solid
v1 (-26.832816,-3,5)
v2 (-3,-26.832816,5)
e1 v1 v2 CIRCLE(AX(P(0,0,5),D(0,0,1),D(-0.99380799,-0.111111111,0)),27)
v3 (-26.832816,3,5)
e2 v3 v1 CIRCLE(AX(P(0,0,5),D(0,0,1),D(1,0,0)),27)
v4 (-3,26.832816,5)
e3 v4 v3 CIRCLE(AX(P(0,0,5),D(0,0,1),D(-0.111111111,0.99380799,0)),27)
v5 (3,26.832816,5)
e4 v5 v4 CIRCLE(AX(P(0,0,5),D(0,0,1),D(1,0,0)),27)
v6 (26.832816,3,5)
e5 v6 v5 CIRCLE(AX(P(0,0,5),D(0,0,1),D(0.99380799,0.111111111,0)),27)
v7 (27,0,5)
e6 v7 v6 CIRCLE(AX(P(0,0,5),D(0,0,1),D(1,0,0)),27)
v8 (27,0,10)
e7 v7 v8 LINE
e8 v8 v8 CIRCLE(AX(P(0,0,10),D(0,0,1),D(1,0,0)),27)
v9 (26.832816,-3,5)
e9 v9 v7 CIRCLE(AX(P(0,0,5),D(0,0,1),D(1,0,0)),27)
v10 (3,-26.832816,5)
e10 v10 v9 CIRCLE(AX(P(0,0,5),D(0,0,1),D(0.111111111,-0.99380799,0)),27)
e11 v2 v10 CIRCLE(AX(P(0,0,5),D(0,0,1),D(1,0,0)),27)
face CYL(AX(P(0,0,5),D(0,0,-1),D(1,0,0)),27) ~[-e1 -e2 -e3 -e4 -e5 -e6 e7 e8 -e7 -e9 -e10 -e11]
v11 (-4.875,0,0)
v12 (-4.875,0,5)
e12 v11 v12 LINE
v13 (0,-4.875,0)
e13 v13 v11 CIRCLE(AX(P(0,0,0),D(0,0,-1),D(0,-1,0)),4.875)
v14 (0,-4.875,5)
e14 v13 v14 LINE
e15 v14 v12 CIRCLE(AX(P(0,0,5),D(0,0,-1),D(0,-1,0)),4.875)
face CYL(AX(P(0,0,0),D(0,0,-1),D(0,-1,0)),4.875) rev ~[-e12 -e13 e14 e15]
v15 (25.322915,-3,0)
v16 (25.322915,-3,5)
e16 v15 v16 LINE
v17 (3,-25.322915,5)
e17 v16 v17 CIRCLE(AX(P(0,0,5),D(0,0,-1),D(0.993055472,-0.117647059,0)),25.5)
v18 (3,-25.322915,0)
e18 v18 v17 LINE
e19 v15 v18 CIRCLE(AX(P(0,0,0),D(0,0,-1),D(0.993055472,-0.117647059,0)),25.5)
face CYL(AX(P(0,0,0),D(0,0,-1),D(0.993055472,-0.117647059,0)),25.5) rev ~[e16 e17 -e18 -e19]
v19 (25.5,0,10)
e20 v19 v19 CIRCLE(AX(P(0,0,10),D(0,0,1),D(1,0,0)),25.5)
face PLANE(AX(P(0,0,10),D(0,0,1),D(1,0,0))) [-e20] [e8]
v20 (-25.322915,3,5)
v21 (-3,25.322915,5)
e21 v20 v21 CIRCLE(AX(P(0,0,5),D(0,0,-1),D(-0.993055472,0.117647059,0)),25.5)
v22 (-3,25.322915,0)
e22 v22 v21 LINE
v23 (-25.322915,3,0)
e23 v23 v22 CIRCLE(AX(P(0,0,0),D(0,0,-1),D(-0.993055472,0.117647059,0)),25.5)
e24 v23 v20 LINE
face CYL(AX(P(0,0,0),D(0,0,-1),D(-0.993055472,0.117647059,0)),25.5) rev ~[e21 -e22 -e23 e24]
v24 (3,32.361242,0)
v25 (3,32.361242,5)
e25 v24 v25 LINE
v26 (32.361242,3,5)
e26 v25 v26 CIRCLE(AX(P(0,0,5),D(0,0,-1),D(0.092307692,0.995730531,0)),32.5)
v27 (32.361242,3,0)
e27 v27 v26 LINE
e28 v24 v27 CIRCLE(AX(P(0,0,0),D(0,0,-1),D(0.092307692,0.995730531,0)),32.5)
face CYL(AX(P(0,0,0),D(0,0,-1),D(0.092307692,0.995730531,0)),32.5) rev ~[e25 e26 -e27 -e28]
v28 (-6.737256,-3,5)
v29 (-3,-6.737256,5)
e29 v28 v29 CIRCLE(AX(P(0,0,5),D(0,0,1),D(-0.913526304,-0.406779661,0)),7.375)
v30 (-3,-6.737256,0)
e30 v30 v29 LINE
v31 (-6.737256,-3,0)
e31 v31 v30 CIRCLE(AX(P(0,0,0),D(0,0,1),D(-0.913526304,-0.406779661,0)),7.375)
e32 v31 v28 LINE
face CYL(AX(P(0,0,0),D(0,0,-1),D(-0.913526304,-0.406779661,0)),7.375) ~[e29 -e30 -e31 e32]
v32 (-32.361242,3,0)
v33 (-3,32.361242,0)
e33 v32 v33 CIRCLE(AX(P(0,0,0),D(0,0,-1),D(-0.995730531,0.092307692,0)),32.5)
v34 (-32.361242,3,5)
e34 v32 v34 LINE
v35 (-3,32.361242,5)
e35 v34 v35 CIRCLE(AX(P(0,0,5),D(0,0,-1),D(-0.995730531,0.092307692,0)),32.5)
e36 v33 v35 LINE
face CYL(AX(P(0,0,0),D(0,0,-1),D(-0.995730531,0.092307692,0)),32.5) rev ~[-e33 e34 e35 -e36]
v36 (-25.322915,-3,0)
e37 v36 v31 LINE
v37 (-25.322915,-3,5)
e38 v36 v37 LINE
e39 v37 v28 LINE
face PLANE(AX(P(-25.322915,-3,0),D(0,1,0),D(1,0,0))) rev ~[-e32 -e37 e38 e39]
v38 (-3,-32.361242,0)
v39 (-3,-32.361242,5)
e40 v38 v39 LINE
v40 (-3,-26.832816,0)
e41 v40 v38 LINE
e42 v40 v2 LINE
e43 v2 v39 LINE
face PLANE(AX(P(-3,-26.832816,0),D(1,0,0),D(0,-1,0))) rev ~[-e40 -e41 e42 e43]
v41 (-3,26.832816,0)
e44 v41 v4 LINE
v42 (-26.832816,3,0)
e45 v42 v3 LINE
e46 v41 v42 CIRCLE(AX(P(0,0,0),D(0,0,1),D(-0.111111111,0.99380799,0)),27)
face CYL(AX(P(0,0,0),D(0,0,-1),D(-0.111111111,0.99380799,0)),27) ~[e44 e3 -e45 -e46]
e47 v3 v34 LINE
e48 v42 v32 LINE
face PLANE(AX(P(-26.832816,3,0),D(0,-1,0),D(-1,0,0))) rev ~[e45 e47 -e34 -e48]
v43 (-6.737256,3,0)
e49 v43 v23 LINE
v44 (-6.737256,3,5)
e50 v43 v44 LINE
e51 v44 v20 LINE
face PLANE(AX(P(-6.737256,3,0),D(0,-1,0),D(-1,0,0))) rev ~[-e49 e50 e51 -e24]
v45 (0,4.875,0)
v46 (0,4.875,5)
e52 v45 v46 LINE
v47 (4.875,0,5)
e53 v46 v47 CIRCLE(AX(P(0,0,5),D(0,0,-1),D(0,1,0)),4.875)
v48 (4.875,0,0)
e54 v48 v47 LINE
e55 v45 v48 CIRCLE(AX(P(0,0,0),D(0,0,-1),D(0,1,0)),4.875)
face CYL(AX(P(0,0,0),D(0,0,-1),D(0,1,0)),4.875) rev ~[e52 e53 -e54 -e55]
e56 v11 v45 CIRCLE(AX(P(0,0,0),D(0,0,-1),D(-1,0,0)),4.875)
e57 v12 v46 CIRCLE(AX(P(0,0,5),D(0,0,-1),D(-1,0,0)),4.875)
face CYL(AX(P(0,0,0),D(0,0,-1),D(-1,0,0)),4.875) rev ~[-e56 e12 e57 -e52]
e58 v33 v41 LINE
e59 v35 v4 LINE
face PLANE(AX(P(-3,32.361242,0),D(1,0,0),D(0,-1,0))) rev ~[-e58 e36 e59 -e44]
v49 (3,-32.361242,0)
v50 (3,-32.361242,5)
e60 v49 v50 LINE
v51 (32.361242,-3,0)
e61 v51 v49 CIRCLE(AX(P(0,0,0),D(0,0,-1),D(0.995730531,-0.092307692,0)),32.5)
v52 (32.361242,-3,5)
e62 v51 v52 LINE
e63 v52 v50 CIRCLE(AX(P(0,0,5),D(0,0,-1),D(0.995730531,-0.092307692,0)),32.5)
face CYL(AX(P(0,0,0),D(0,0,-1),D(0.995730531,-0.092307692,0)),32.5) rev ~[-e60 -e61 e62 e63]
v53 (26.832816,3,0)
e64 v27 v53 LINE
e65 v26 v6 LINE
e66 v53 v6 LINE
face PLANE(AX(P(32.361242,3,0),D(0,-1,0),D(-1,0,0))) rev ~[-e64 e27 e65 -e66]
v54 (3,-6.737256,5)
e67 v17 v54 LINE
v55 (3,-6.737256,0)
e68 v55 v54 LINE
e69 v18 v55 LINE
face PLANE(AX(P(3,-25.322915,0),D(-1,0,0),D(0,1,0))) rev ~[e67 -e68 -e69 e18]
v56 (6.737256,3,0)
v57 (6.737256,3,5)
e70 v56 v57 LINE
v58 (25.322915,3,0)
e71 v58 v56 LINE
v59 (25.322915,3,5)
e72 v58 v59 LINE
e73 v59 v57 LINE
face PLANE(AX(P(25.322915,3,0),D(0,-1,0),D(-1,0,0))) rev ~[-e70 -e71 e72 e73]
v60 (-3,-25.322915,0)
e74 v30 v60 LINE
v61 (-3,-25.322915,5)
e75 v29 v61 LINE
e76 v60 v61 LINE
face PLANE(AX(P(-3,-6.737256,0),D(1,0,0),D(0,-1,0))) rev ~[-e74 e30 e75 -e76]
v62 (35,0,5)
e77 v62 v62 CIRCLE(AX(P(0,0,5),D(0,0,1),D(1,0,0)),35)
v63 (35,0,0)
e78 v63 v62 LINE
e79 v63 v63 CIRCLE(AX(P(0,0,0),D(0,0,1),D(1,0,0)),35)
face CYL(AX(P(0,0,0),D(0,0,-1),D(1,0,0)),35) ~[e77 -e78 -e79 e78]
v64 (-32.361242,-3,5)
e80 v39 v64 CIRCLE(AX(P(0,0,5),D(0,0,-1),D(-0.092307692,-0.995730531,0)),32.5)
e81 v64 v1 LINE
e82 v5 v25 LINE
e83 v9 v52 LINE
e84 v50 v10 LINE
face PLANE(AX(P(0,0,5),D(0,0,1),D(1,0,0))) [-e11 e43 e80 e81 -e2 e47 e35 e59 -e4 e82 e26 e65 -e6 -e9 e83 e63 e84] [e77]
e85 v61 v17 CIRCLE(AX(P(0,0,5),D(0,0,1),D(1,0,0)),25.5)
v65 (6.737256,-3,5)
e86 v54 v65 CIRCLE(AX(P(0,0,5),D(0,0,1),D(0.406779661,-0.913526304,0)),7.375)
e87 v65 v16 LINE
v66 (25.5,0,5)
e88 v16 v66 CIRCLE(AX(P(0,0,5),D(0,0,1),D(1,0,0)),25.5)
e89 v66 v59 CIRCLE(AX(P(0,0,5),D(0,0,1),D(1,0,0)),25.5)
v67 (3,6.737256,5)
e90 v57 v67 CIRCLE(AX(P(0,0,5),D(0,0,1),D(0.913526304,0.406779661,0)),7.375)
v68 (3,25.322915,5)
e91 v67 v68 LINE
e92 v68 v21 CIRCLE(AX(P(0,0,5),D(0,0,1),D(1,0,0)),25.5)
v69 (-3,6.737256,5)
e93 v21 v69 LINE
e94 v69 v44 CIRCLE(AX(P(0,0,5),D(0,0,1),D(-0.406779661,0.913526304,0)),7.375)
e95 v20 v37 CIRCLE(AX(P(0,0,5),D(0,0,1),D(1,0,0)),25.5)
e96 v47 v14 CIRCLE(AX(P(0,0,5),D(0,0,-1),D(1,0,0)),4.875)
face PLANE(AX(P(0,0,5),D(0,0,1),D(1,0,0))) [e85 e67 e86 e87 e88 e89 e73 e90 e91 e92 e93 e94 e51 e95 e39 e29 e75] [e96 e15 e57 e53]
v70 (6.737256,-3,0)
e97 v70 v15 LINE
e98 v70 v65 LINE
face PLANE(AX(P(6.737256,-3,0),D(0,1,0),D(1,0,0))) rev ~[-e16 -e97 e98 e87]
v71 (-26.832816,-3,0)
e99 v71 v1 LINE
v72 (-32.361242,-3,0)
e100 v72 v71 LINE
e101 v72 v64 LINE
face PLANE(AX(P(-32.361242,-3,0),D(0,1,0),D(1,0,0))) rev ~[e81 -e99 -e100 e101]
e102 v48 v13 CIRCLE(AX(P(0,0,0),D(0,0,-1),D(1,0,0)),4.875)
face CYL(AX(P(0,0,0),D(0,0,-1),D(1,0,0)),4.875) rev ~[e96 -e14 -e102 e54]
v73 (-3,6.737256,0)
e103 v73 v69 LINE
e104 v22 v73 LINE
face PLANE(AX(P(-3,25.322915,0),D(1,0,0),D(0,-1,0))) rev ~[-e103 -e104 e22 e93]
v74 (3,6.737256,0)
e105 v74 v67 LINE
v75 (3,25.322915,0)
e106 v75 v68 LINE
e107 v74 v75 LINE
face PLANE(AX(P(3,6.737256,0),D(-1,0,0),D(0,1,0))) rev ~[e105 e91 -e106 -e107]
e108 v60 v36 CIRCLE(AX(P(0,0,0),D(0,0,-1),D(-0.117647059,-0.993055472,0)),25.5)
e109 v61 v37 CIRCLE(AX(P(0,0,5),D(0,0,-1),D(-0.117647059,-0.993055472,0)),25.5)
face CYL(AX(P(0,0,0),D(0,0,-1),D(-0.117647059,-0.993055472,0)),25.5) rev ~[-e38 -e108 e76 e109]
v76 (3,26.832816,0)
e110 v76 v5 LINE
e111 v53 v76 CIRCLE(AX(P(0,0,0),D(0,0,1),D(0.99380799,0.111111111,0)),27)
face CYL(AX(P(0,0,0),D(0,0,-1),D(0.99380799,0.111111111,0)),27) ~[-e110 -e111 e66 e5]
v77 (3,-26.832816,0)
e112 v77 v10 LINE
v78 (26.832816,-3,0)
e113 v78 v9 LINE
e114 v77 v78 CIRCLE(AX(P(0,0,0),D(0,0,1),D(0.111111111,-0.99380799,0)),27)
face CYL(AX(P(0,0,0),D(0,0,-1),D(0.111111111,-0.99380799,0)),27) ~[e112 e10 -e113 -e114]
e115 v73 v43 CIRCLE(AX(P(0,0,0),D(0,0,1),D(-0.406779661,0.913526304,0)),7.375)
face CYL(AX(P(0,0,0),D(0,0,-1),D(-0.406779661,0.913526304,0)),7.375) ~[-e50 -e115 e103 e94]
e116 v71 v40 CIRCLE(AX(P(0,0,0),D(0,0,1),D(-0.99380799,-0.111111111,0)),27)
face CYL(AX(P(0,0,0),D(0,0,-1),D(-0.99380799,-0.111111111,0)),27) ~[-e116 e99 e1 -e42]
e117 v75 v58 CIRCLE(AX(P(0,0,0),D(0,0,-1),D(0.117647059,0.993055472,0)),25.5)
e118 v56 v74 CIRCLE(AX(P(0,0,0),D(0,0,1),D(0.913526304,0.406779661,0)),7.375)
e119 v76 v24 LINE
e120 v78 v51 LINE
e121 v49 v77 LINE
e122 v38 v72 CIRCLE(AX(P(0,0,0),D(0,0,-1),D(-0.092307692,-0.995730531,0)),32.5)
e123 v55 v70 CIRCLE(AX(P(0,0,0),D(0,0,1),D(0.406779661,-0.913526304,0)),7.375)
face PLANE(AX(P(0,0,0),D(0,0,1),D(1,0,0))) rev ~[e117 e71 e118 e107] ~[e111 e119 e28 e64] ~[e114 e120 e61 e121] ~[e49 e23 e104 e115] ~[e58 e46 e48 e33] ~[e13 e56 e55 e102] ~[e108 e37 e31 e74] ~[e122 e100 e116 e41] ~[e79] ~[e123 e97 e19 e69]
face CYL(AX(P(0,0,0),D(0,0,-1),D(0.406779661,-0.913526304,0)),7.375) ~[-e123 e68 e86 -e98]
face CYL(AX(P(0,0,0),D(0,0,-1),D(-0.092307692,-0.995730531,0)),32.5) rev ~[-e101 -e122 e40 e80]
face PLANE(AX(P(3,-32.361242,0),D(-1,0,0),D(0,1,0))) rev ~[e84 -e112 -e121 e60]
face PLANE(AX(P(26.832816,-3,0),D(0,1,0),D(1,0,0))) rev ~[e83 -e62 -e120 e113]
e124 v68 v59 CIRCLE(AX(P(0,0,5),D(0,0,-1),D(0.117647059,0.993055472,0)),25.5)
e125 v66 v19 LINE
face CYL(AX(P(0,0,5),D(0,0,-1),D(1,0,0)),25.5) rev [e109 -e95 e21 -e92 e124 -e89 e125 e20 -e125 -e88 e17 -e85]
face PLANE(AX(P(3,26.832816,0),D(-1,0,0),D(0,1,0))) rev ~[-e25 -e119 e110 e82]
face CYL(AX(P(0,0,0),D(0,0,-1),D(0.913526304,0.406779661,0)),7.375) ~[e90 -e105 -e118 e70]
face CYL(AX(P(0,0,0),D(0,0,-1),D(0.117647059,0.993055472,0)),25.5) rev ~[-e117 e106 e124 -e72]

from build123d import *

# Parameters (mm, degrees)
F0_R     = 35
F1_DEPTH = 5
F2_R     = 27
F2_R_2   = 25.5
F3_DEPTH = 5


with BuildPart() as f1:
    # F0 (on Top) → F1 (new body)
    with BuildSketch(Plane.XY):
        Circle(F0_R)
        with BuildLine():
            ThreePointArc((3, 32.3612422506), (22.9809703886, 22.9809703886), (32.3612422506, 3))
            ThreePointArc((32.3612422506, 3), (32.4652920297, 1.5016036189), (32.5, 0))
            ThreePointArc((32.5, 0), (32.4652920297, -1.5016036189), (32.3612422506, -3))
            ThreePointArc((32.3612422506, -3), (22.9809703886, -22.9809703886), (3, -32.3612422506))
            ThreePointArc((3, -32.3612422506), (0, -32.5), (-3, -32.3612422506))
            ThreePointArc((-3, -32.3612422506), (-22.9809703886, -22.9809703886), (-32.3612422506, -3))
            ThreePointArc((-32.3612422506, -3), (-32.5, 0), (-32.3612422506, 3))
            ThreePointArc((-32.3612422506, 3), (-22.9809703886, 22.9809703886), (-3, 32.3612422506))
            ThreePointArc((-3, 32.3612422506), (0, 32.5), (3, 32.3612422506))
        make_face(mode=Mode.SUBTRACT)
        with BuildLine():
            ThreePointArc((-6.7372564891, -3), (-7.2138024511, -1.5335185674), (-7.375, 0))
            ThreePointArc((-7.375, 0), (-7.2138024511, 1.5335185674), (-6.7372564891, 3))
            Line((-6.7372564891, 3), (-23.8117617996, 3))
            ThreePointArc((-23.8117617996, 3), (-24, 0), (-23.8117617996, -3))
            Line((-23.8117617996, -3), (-6.7372564891, -3))
        make_face()
        with BuildLine():
            ThreePointArc((-4.875, 0), (-3.4471455583, 3.4471455583), (0, 4.875))
            Line((0, 4.875), (0, 7.375))
            ThreePointArc((0, 7.375), (-1.5335185674, 7.2138024511), (-3, 6.7372564891))
            ThreePointArc((-3, 6.7372564891), (-5.2149125113, 5.2149125113), (-6.7372564891, 3))
            ThreePointArc((-6.7372564891, 3), (-7.2138024511, 1.5335185674), (-7.375, 0))
            Line((-7.375, 0), (-4.875, 0))
        make_face()
        with BuildLine():
            Line((0, -7.375), (0, -4.875))
            ThreePointArc((0, -4.875), (-3.4471455583, -3.4471455583), (-4.875, 0))
            Line((-4.875, 0), (-7.375, 0))
            ThreePointArc((-7.375, 0), (-7.2138024511, -1.5335185674), (-6.7372564891, -3))
            ThreePointArc((-6.7372564891, -3), (-5.2149125113, -5.2149125113), (-3, -6.7372564891))
            ThreePointArc((-3, -6.7372564891), (-1.5335185674, -7.2138024511), (0, -7.375))
        make_face()
        with BuildLine():
            Line((7.375, 0), (4.875, 0))
            ThreePointArc((4.875, 0), (3.4471455583, -3.4471455583), (0, -4.875))
            Line((0, -4.875), (0, -7.375))
            ThreePointArc((0, -7.375), (1.5335185674, -7.2138024511), (3, -6.7372564891))
            ThreePointArc((3, -6.7372564891), (5.2149125113, -5.2149125113), (6.7372564891, -3))
            ThreePointArc((6.7372564891, -3), (7.2138024511, -1.5335185674), (7.375, 0))
        make_face()
        with BuildLine():
            ThreePointArc((0, 4.875), (3.4471455583, 3.4471455583), (4.875, 0))
            Line((4.875, 0), (7.375, 0))
            ThreePointArc((7.375, 0), (7.2138024511, 1.5335185674), (6.7372564891, 3))
            ThreePointArc((6.7372564891, 3), (5.2149125113, 5.2149125113), (3, 6.7372564891))
            ThreePointArc((3, 6.7372564891), (1.5335185674, 7.2138024511), (0, 7.375))
            Line((0, 7.375), (0, 4.875))
        make_face()
        with BuildLine():
            ThreePointArc((-3, 6.7372564891), (-1.5335185674, 7.2138024511), (0, 7.375))
            ThreePointArc((0, 7.375), (1.5335185674, 7.2138024511), (3, 6.7372564891))
            Line((3, 6.7372564891), (3, 23.8117617996))
            ThreePointArc((3, 23.8117617996), (0, 24), (-3, 23.8117617996))
            Line((-3, 23.8117617996), (-3, 6.7372564891))
        make_face()
        with BuildLine():
            ThreePointArc((6.7372564891, 3), (7.2138024511, 1.5335185674), (7.375, 0))
            ThreePointArc((7.375, 0), (7.2138024511, -1.5335185674), (6.7372564891, -3))
            Line((6.7372564891, -3), (23.8117617996, -3))
            ThreePointArc((23.8117617996, -3), (23.9528942217, -1.502949901), (24, 0))
            ThreePointArc((24, 0), (23.9528942217, 1.502949901), (23.8117617996, 3))
            Line((23.8117617996, 3), (6.7372564891, 3))
        make_face()
        with BuildLine():
            ThreePointArc((3, -6.7372564891), (1.5335185674, -7.2138024511), (0, -7.375))
            ThreePointArc((0, -7.375), (-1.5335185674, -7.2138024511), (-3, -6.7372564891))
            Line((-3, -6.7372564891), (-3, -23.8117617996))
            ThreePointArc((-3, -23.8117617996), (0, -24), (3, -23.8117617996))
            Line((3, -23.8117617996), (3, -6.7372564891))
        make_face()
        with BuildLine():
            ThreePointArc((-3, 23.8117617996), (0, 24), (3, 23.8117617996))
            Line((3, 23.8117617996), (3, 25.3229145242))
            ThreePointArc((3, 25.3229145242), (0, 25.5), (-3, 25.3229145242))
            Line((-3, 25.3229145242), (-3, 23.8117617996))
        make_face()
        with BuildLine():
            ThreePointArc((-3, 25.3229145242), (0, 25.5), (3, 25.3229145242))
            Line((3, 25.3229145242), (3, 26.83281573))
            ThreePointArc((3, 26.83281573), (0, 27), (-3, 26.83281573))
            Line((-3, 26.83281573), (-3, 25.3229145242))
        make_face()
        with BuildLine():
            ThreePointArc((-3, 26.83281573), (0, 27), (3, 26.83281573))
            Line((3, 26.83281573), (3, 32.3612422506))
            ThreePointArc((3, 32.3612422506), (0, 32.5), (-3, 32.3612422506))
            Line((-3, 32.3612422506), (-3, 26.83281573))
        make_face()
        with BuildLine():
            Line((25.3229145242, 3), (23.8117617996, 3))
            ThreePointArc((23.8117617996, 3), (23.9528942217, 1.502949901), (24, 0))
            ThreePointArc((24, 0), (23.9528942217, -1.502949901), (23.8117617996, -3))
            Line((23.8117617996, -3), (25.3229145242, -3))
            ThreePointArc((25.3229145242, -3), (25.4556901337, -1.5026109997), (25.5, 0))
            ThreePointArc((25.5, 0), (25.4556901337, 1.5026109997), (25.3229145242, 3))
        make_face()
        with BuildLine():
            Line((26.83281573, 3), (25.3229145242, 3))
            ThreePointArc((25.3229145242, 3), (25.4556901337, 1.5026109997), (25.5, 0))
            ThreePointArc((25.5, 0), (25.4556901337, -1.5026109997), (25.3229145242, -3))
            Line((25.3229145242, -3), (26.83281573, -3))
            ThreePointArc((26.83281573, -3), (26.9581715321, -1.5023274094), (27, 0))
            ThreePointArc((27, 0), (26.9581715321, 1.5023274094), (26.83281573, 3))
        make_face()
        with BuildLine():
            Line((32.3612422506, 3), (26.83281573, 3))
            ThreePointArc((26.83281573, 3), (26.9581715321, 1.5023274094), (27, 0))
            ThreePointArc((27, 0), (26.9581715321, -1.5023274094), (26.83281573, -3))
            Line((26.83281573, -3), (32.3612422506, -3))
            ThreePointArc((32.3612422506, -3), (32.4652920297, -1.5016036189), (32.5, 0))
            ThreePointArc((32.5, 0), (32.4652920297, 1.5016036189), (32.3612422506, 3))
        make_face()
        with BuildLine():
            ThreePointArc((-23.8117617996, -3), (-24, 0), (-23.8117617996, 3))
            Line((-23.8117617996, 3), (-25.3229145242, 3))
            ThreePointArc((-25.3229145242, 3), (-25.5, 0), (-25.3229145242, -3))
            Line((-25.3229145242, -3), (-23.8117617996, -3))
        make_face()
        with BuildLine():
            ThreePointArc((-25.3229145242, -3), (-25.5, 0), (-25.3229145242, 3))
            Line((-25.3229145242, 3), (-26.83281573, 3))
            ThreePointArc((-26.83281573, 3), (-27, 0), (-26.83281573, -3))
            Line((-26.83281573, -3), (-25.3229145242, -3))
        make_face()
        with BuildLine():
            ThreePointArc((-26.83281573, -3), (-27, 0), (-26.83281573, 3))
            Line((-26.83281573, 3), (-32.3612422506, 3))
            ThreePointArc((-32.3612422506, 3), (-32.5, 0), (-32.3612422506, -3))
            Line((-32.3612422506, -3), (-26.83281573, -3))
        make_face()
        with BuildLine():
            ThreePointArc((3, -23.8117617996), (0, -24), (-3, -23.8117617996))
            Line((-3, -23.8117617996), (-3, -25.3229145242))
            ThreePointArc((-3, -25.3229145242), (0, -25.5), (3, -25.3229145242))
            Line((3, -25.3229145242), (3, -23.8117617996))
        make_face()
        with BuildLine():
            ThreePointArc((3, -25.3229145242), (0, -25.5), (-3, -25.3229145242))
            Line((-3, -25.3229145242), (-3, -26.83281573))
            ThreePointArc((-3, -26.83281573), (0, -27), (3, -26.83281573))
            Line((3, -26.83281573), (3, -25.3229145242))
        make_face()
        with BuildLine():
            ThreePointArc((3, -26.83281573), (0, -27), (-3, -26.83281573))
            Line((-3, -26.83281573), (-3, -32.3612422506))
            ThreePointArc((-3, -32.3612422506), (0, -32.5), (3, -32.3612422506))
            Line((3, -32.3612422506), (3, -26.83281573))
        make_face()
        with BuildLine():
            ThreePointArc((-25.3229145242, 3), (-18.0312229203, 18.0312229203), (-3, 25.3229145242))
            Line((-3, 25.3229145242), (-3, 26.83281573))
            ThreePointArc((-3, 26.83281573), (-19.091883092, 19.091883092), (-26.83281573, 3))
            Line((-26.83281573, 3), (-25.3229145242, 3))
        make_face()
        with BuildLine():
            ThreePointArc((3, 25.3229145242), (18.0312229203, 18.0312229203), (25.3229145242, 3))
            Line((25.3229145242, 3), (26.83281573, 3))
            ThreePointArc((26.83281573, 3), (19.091883092, 19.091883092), (3, 26.83281573))
            Line((3, 26.83281573), (3, 25.3229145242))
        make_face()
        with BuildLine():
            Line((26.83281573, -3), (25.3229145242, -3))
            ThreePointArc((25.3229145242, -3), (18.0312229203, -18.0312229203), (3, -25.3229145242))
            Line((3, -25.3229145242), (3, -26.83281573))
            ThreePointArc((3, -26.83281573), (19.091883092, -19.091883092), (26.83281573, -3))
        make_face()
        with BuildLine():
            Line((-3, -26.83281573), (-3, -25.3229145242))
            ThreePointArc((-3, -25.3229145242), (-18.0312229203, -18.0312229203), (-25.3229145242, -3))
            Line((-25.3229145242, -3), (-26.83281573, -3))
            ThreePointArc((-26.83281573, -3), (-19.091883092, -19.091883092), (-3, -26.83281573))
        make_face()
    extrude(amount=F1_DEPTH)

    # F2 (on face) → F3 (join)
    with BuildSketch(Plane.XY.offset(5)):
        Circle(F2_R)
        Circle(F2_R_2, mode=Mode.SUBTRACT)
    extrude(amount=F3_DEPTH)


solid = f1.part
